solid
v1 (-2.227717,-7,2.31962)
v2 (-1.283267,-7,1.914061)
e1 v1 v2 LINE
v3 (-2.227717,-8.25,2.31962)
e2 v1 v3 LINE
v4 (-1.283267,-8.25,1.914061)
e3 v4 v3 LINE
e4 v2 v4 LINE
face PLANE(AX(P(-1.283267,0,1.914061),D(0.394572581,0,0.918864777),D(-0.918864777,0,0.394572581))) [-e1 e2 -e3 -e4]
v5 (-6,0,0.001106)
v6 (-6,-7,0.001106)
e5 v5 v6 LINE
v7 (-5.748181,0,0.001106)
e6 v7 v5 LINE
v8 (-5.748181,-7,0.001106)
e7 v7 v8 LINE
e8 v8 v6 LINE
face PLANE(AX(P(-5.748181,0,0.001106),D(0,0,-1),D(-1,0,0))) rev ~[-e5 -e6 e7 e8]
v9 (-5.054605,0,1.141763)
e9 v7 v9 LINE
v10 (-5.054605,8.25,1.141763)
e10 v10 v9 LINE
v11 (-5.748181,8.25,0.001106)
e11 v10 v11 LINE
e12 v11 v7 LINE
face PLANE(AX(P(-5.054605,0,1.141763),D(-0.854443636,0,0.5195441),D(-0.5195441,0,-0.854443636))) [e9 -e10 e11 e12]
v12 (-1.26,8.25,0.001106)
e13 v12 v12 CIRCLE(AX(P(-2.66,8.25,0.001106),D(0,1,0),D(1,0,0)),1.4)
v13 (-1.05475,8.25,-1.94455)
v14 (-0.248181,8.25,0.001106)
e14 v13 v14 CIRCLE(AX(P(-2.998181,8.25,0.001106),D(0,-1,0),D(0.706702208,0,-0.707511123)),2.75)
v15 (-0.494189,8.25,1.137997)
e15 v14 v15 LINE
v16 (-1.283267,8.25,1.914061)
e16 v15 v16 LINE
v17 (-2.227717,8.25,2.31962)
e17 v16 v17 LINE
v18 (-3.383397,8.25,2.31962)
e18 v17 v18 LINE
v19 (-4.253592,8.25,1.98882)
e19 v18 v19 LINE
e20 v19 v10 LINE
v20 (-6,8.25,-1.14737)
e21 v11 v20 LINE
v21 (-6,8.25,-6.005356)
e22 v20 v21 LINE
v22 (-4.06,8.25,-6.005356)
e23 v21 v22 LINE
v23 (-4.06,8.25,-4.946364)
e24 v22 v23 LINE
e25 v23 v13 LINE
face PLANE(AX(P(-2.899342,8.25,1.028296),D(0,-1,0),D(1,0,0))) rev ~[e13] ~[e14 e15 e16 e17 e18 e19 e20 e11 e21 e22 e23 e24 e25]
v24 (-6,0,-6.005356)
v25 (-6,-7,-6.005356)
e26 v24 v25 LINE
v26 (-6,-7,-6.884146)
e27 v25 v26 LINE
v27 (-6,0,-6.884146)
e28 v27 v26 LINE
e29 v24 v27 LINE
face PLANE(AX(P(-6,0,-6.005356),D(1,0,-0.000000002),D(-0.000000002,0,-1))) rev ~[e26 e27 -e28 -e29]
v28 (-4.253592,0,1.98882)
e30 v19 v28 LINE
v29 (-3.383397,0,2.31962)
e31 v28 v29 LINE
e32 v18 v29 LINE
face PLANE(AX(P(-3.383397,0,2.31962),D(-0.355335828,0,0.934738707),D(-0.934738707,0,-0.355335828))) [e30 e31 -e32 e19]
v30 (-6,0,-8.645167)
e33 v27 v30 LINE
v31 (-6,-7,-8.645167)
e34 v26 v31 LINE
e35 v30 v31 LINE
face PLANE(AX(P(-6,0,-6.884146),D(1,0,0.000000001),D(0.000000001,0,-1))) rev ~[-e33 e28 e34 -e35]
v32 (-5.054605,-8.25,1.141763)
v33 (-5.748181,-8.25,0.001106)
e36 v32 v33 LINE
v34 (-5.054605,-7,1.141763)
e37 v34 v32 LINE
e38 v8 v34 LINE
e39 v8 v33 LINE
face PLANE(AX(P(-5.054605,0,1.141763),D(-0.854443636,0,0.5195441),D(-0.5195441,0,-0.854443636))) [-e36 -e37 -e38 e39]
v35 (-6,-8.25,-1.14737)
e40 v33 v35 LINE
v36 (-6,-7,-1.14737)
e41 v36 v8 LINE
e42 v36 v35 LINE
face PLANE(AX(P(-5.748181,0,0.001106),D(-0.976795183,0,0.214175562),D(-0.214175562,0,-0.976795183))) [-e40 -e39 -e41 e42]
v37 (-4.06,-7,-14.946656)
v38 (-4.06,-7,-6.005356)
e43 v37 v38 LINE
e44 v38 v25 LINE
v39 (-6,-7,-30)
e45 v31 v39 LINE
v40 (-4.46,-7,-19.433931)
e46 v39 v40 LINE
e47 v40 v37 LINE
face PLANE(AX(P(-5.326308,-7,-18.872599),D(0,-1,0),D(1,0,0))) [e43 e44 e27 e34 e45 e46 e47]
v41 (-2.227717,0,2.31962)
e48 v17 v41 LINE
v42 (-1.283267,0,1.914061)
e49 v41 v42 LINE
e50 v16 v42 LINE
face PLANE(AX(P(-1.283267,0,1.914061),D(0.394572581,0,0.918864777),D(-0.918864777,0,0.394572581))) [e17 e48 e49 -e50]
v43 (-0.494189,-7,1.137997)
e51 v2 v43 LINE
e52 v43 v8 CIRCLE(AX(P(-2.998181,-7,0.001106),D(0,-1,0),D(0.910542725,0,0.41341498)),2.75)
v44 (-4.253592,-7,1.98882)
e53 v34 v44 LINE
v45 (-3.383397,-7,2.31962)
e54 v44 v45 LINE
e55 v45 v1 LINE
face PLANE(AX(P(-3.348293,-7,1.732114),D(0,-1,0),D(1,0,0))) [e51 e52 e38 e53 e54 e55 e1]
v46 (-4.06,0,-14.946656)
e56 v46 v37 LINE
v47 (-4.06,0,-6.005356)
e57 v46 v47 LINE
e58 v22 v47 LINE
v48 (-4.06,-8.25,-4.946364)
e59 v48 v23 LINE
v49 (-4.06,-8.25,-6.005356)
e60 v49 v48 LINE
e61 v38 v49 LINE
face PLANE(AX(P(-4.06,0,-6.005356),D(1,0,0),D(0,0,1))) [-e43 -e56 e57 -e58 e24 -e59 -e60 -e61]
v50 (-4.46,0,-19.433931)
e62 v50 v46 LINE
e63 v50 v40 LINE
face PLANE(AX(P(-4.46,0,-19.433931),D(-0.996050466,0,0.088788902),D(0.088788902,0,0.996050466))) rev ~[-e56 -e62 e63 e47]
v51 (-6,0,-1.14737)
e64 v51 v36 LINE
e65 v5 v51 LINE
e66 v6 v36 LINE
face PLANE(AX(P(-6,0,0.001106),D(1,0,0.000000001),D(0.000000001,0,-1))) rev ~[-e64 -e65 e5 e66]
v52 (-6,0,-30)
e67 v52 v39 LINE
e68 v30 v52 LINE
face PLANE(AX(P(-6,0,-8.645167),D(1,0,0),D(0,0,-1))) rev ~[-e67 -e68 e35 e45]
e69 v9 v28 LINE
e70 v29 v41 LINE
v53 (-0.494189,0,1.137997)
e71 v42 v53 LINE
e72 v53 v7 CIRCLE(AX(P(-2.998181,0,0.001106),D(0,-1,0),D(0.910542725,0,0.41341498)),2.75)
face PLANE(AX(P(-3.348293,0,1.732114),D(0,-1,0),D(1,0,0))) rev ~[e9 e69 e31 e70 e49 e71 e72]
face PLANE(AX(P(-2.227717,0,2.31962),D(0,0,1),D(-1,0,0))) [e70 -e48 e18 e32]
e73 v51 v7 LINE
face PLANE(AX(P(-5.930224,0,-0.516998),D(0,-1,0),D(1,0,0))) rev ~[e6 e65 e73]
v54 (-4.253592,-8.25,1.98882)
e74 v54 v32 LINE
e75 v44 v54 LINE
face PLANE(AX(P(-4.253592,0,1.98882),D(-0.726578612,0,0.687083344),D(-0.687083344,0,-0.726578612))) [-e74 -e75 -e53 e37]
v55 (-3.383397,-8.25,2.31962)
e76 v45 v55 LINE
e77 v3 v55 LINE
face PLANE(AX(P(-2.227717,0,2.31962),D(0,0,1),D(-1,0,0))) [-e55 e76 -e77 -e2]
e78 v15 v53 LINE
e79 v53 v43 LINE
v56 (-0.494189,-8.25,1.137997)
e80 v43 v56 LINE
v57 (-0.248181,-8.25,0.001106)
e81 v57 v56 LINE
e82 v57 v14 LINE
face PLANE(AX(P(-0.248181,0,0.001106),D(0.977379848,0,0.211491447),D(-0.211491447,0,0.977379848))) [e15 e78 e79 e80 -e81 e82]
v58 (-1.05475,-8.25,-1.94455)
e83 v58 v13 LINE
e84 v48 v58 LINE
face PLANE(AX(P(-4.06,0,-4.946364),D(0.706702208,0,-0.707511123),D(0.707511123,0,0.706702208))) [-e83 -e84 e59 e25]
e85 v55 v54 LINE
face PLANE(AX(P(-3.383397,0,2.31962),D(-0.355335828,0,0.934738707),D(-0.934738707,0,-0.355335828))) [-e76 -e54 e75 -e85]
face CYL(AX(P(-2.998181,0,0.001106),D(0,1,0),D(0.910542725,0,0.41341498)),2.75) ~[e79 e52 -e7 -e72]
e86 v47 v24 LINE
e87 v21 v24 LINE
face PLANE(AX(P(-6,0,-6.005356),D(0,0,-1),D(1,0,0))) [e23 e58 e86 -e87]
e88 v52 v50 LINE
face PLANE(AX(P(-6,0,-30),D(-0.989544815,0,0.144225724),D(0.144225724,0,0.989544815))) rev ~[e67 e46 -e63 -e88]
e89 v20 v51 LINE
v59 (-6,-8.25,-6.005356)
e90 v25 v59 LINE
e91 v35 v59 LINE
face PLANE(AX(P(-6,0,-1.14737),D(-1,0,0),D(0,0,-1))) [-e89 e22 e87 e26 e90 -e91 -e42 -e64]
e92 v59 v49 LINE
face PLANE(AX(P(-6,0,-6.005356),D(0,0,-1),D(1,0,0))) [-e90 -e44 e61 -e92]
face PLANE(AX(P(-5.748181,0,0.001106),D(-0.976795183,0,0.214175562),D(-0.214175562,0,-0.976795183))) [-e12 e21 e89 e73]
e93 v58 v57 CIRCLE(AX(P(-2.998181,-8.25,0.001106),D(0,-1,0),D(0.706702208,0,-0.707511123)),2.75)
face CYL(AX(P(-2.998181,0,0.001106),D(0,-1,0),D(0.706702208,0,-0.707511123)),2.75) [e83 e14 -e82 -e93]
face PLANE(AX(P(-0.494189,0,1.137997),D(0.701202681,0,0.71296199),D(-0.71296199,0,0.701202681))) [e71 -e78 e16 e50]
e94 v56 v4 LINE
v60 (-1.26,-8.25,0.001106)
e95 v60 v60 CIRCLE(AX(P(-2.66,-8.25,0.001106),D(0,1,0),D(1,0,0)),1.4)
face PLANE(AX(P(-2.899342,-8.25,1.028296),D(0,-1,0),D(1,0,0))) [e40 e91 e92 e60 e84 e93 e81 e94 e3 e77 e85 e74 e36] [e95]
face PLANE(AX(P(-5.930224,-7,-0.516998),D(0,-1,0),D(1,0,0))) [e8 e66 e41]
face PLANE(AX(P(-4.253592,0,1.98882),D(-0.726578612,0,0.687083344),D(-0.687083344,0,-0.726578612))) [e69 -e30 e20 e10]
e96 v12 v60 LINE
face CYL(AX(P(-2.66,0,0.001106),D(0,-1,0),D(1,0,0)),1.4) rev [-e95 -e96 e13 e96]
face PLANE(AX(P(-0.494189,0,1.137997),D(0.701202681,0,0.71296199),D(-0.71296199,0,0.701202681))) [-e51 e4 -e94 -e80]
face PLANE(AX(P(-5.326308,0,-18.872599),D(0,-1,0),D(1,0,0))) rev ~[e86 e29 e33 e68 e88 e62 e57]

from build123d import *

# Parameters (mm, degrees)
F1_DEPTH = 8.25
F2_DEPTH = 7


# Not quite as in the source:
# - a feature names something its author has since deleted; it is built from what else it names


with BuildPart() as f1:
    # F0 (on Front) → F1 (new body, symmetric)
    with BuildSketch(Plane.XZ):
        with BuildLine():
            Line((-1.2599999983, 0.001106019), (-0.2481810163, 0.001106019))
            Line((-0.2481810241, 0.001106019), (-0.4941885147, 1.1379972147))
            Line((-0.4941885147, 1.1379972147), (-1.2832667135, 1.9140606746))
            Line((-1.2832667135, 1.9140606746), (-2.2277169394, 2.3196199825))
            Line((-2.2277169394, 2.3196199825), (-3.3833966788, 2.3196199825))
            Line((-3.3833966788, 2.3196199825), (-4.2535923825, 1.9888198258))
            Line((-4.2535923825, 1.9888198258), (-5.0546050044, 1.1417629963))
            Line((-5.0546050044, 1.1417629963), (-5.7481810085, 0.001106019))
            Line((-5.7481810085, 0.001106019), (-4.0599999983, 0.001106019))
            ThreePointArc((-4.0599999983, 0.001106019), (-2.6599999983, 1.401106019), (-1.2599999983, 0.001106019))
        make_face()
        with BuildLine():
            ThreePointArc((-1.0547499373, -1.9445495701), (-0.4578133732, -1.0519999951), (-0.2481810085, 0.001106019))
            Line((-0.2481810163, 0.001106019), (-1.2599999983, 0.001106019))
            ThreePointArc((-1.2599999983, 0.001106019), (-2.6599999983, -1.398893981), (-4.0599999983, 0.001106019))
            Line((-4.0599999983, 0.001106019), (-5.7481810085, 0.001106019))
            ThreePointArc((-5.7481810085, 0.001106019), (-4.0512870227, -2.5392616163), (-1.0547499373, -1.9445495701))
        make_face()
        with BuildLine():
            Line((-4.0599999966, -4.9463636499), (-1.0547499373, -1.9445495701))
            ThreePointArc((-1.0547499373, -1.9445495701), (-4.0512870227, -2.5392616163), (-5.7481810085, 0.001106019))
            Line((-5.7481810085, 0.001106019), (-5.9999999983, -1.1473703696))
            Line((-5.9999999983, -1.1473703696), (-5.9999999983, -4.8066070303))
            Line((-5.9999999983, -4.8066070303), (-5.9999999983, -6.0053556226))
            Line((-5.9999999983, -6.0053556226), (-5.1202041279, -6.0053556226))
            Line((-5.1202041279, -6.0053556226), (-4.0599999966, -4.9463636499))
        make_face()
        Polygon((-4.0599999966, -6.0053556226), (-4.0599999966, -4.9463636499), (-5.1202041279, -6.0053556226), align=None)
    extrude(amount=F1_DEPTH, both=True)

    # F0 (on Front) → F2 (join)
    with BuildSketch(Plane.XZ):
        with BuildLine():
            Line((-1.2832667135, 1.9140606746), (-0.4941885147, 1.1379972147))
            ThreePointArc((-0.4941885147, 1.1379972147), (-3.5797825225, 2.6889005943), (-5.7481810085, 0.001106019))
            Line((-5.7481810085, 0.001106019), (-5.0546050044, 1.1417629963))
            Line((-5.0546050044, 1.1417629963), (-4.2535923825, 1.9888198258))
            Line((-4.2535923825, 1.9888198258), (-3.3833966788, 2.3196199825))
            Line((-3.3833966788, 2.3196199825), (-2.2277169394, 2.3196199825))
            Line((-2.2277169394, 2.3196199825), (-1.2832667135, 1.9140606746))
        make_face()
        Polygon((-5.9999999983, -1.1473703696), (-5.7481810085, 0.001106019), (-6, 0.001106019), align=None)
        Polygon((-4.0599999966, -14.9466558945), (-4.0599999966, -8.645166643), (-5.9999999983, -8.645166643), (-5.9999999983, -30), (-4.4599999966, -19.4339305162), align=None)
        Polygon((-4.0599999966, -6.0053556226), (-5.1202041279, -6.0053556226), (-6, -6.8841456016), (-5.9999999983, -8.645166643), (-4.0599999966, -8.645166643), align=None)
        Polygon((-6, -6.8841456016), (-5.1202041279, -6.0053556226), (-5.9999999983, -6.0053556226), align=None)
    extrude(amount=F2_DEPTH)


solid = f1.part
